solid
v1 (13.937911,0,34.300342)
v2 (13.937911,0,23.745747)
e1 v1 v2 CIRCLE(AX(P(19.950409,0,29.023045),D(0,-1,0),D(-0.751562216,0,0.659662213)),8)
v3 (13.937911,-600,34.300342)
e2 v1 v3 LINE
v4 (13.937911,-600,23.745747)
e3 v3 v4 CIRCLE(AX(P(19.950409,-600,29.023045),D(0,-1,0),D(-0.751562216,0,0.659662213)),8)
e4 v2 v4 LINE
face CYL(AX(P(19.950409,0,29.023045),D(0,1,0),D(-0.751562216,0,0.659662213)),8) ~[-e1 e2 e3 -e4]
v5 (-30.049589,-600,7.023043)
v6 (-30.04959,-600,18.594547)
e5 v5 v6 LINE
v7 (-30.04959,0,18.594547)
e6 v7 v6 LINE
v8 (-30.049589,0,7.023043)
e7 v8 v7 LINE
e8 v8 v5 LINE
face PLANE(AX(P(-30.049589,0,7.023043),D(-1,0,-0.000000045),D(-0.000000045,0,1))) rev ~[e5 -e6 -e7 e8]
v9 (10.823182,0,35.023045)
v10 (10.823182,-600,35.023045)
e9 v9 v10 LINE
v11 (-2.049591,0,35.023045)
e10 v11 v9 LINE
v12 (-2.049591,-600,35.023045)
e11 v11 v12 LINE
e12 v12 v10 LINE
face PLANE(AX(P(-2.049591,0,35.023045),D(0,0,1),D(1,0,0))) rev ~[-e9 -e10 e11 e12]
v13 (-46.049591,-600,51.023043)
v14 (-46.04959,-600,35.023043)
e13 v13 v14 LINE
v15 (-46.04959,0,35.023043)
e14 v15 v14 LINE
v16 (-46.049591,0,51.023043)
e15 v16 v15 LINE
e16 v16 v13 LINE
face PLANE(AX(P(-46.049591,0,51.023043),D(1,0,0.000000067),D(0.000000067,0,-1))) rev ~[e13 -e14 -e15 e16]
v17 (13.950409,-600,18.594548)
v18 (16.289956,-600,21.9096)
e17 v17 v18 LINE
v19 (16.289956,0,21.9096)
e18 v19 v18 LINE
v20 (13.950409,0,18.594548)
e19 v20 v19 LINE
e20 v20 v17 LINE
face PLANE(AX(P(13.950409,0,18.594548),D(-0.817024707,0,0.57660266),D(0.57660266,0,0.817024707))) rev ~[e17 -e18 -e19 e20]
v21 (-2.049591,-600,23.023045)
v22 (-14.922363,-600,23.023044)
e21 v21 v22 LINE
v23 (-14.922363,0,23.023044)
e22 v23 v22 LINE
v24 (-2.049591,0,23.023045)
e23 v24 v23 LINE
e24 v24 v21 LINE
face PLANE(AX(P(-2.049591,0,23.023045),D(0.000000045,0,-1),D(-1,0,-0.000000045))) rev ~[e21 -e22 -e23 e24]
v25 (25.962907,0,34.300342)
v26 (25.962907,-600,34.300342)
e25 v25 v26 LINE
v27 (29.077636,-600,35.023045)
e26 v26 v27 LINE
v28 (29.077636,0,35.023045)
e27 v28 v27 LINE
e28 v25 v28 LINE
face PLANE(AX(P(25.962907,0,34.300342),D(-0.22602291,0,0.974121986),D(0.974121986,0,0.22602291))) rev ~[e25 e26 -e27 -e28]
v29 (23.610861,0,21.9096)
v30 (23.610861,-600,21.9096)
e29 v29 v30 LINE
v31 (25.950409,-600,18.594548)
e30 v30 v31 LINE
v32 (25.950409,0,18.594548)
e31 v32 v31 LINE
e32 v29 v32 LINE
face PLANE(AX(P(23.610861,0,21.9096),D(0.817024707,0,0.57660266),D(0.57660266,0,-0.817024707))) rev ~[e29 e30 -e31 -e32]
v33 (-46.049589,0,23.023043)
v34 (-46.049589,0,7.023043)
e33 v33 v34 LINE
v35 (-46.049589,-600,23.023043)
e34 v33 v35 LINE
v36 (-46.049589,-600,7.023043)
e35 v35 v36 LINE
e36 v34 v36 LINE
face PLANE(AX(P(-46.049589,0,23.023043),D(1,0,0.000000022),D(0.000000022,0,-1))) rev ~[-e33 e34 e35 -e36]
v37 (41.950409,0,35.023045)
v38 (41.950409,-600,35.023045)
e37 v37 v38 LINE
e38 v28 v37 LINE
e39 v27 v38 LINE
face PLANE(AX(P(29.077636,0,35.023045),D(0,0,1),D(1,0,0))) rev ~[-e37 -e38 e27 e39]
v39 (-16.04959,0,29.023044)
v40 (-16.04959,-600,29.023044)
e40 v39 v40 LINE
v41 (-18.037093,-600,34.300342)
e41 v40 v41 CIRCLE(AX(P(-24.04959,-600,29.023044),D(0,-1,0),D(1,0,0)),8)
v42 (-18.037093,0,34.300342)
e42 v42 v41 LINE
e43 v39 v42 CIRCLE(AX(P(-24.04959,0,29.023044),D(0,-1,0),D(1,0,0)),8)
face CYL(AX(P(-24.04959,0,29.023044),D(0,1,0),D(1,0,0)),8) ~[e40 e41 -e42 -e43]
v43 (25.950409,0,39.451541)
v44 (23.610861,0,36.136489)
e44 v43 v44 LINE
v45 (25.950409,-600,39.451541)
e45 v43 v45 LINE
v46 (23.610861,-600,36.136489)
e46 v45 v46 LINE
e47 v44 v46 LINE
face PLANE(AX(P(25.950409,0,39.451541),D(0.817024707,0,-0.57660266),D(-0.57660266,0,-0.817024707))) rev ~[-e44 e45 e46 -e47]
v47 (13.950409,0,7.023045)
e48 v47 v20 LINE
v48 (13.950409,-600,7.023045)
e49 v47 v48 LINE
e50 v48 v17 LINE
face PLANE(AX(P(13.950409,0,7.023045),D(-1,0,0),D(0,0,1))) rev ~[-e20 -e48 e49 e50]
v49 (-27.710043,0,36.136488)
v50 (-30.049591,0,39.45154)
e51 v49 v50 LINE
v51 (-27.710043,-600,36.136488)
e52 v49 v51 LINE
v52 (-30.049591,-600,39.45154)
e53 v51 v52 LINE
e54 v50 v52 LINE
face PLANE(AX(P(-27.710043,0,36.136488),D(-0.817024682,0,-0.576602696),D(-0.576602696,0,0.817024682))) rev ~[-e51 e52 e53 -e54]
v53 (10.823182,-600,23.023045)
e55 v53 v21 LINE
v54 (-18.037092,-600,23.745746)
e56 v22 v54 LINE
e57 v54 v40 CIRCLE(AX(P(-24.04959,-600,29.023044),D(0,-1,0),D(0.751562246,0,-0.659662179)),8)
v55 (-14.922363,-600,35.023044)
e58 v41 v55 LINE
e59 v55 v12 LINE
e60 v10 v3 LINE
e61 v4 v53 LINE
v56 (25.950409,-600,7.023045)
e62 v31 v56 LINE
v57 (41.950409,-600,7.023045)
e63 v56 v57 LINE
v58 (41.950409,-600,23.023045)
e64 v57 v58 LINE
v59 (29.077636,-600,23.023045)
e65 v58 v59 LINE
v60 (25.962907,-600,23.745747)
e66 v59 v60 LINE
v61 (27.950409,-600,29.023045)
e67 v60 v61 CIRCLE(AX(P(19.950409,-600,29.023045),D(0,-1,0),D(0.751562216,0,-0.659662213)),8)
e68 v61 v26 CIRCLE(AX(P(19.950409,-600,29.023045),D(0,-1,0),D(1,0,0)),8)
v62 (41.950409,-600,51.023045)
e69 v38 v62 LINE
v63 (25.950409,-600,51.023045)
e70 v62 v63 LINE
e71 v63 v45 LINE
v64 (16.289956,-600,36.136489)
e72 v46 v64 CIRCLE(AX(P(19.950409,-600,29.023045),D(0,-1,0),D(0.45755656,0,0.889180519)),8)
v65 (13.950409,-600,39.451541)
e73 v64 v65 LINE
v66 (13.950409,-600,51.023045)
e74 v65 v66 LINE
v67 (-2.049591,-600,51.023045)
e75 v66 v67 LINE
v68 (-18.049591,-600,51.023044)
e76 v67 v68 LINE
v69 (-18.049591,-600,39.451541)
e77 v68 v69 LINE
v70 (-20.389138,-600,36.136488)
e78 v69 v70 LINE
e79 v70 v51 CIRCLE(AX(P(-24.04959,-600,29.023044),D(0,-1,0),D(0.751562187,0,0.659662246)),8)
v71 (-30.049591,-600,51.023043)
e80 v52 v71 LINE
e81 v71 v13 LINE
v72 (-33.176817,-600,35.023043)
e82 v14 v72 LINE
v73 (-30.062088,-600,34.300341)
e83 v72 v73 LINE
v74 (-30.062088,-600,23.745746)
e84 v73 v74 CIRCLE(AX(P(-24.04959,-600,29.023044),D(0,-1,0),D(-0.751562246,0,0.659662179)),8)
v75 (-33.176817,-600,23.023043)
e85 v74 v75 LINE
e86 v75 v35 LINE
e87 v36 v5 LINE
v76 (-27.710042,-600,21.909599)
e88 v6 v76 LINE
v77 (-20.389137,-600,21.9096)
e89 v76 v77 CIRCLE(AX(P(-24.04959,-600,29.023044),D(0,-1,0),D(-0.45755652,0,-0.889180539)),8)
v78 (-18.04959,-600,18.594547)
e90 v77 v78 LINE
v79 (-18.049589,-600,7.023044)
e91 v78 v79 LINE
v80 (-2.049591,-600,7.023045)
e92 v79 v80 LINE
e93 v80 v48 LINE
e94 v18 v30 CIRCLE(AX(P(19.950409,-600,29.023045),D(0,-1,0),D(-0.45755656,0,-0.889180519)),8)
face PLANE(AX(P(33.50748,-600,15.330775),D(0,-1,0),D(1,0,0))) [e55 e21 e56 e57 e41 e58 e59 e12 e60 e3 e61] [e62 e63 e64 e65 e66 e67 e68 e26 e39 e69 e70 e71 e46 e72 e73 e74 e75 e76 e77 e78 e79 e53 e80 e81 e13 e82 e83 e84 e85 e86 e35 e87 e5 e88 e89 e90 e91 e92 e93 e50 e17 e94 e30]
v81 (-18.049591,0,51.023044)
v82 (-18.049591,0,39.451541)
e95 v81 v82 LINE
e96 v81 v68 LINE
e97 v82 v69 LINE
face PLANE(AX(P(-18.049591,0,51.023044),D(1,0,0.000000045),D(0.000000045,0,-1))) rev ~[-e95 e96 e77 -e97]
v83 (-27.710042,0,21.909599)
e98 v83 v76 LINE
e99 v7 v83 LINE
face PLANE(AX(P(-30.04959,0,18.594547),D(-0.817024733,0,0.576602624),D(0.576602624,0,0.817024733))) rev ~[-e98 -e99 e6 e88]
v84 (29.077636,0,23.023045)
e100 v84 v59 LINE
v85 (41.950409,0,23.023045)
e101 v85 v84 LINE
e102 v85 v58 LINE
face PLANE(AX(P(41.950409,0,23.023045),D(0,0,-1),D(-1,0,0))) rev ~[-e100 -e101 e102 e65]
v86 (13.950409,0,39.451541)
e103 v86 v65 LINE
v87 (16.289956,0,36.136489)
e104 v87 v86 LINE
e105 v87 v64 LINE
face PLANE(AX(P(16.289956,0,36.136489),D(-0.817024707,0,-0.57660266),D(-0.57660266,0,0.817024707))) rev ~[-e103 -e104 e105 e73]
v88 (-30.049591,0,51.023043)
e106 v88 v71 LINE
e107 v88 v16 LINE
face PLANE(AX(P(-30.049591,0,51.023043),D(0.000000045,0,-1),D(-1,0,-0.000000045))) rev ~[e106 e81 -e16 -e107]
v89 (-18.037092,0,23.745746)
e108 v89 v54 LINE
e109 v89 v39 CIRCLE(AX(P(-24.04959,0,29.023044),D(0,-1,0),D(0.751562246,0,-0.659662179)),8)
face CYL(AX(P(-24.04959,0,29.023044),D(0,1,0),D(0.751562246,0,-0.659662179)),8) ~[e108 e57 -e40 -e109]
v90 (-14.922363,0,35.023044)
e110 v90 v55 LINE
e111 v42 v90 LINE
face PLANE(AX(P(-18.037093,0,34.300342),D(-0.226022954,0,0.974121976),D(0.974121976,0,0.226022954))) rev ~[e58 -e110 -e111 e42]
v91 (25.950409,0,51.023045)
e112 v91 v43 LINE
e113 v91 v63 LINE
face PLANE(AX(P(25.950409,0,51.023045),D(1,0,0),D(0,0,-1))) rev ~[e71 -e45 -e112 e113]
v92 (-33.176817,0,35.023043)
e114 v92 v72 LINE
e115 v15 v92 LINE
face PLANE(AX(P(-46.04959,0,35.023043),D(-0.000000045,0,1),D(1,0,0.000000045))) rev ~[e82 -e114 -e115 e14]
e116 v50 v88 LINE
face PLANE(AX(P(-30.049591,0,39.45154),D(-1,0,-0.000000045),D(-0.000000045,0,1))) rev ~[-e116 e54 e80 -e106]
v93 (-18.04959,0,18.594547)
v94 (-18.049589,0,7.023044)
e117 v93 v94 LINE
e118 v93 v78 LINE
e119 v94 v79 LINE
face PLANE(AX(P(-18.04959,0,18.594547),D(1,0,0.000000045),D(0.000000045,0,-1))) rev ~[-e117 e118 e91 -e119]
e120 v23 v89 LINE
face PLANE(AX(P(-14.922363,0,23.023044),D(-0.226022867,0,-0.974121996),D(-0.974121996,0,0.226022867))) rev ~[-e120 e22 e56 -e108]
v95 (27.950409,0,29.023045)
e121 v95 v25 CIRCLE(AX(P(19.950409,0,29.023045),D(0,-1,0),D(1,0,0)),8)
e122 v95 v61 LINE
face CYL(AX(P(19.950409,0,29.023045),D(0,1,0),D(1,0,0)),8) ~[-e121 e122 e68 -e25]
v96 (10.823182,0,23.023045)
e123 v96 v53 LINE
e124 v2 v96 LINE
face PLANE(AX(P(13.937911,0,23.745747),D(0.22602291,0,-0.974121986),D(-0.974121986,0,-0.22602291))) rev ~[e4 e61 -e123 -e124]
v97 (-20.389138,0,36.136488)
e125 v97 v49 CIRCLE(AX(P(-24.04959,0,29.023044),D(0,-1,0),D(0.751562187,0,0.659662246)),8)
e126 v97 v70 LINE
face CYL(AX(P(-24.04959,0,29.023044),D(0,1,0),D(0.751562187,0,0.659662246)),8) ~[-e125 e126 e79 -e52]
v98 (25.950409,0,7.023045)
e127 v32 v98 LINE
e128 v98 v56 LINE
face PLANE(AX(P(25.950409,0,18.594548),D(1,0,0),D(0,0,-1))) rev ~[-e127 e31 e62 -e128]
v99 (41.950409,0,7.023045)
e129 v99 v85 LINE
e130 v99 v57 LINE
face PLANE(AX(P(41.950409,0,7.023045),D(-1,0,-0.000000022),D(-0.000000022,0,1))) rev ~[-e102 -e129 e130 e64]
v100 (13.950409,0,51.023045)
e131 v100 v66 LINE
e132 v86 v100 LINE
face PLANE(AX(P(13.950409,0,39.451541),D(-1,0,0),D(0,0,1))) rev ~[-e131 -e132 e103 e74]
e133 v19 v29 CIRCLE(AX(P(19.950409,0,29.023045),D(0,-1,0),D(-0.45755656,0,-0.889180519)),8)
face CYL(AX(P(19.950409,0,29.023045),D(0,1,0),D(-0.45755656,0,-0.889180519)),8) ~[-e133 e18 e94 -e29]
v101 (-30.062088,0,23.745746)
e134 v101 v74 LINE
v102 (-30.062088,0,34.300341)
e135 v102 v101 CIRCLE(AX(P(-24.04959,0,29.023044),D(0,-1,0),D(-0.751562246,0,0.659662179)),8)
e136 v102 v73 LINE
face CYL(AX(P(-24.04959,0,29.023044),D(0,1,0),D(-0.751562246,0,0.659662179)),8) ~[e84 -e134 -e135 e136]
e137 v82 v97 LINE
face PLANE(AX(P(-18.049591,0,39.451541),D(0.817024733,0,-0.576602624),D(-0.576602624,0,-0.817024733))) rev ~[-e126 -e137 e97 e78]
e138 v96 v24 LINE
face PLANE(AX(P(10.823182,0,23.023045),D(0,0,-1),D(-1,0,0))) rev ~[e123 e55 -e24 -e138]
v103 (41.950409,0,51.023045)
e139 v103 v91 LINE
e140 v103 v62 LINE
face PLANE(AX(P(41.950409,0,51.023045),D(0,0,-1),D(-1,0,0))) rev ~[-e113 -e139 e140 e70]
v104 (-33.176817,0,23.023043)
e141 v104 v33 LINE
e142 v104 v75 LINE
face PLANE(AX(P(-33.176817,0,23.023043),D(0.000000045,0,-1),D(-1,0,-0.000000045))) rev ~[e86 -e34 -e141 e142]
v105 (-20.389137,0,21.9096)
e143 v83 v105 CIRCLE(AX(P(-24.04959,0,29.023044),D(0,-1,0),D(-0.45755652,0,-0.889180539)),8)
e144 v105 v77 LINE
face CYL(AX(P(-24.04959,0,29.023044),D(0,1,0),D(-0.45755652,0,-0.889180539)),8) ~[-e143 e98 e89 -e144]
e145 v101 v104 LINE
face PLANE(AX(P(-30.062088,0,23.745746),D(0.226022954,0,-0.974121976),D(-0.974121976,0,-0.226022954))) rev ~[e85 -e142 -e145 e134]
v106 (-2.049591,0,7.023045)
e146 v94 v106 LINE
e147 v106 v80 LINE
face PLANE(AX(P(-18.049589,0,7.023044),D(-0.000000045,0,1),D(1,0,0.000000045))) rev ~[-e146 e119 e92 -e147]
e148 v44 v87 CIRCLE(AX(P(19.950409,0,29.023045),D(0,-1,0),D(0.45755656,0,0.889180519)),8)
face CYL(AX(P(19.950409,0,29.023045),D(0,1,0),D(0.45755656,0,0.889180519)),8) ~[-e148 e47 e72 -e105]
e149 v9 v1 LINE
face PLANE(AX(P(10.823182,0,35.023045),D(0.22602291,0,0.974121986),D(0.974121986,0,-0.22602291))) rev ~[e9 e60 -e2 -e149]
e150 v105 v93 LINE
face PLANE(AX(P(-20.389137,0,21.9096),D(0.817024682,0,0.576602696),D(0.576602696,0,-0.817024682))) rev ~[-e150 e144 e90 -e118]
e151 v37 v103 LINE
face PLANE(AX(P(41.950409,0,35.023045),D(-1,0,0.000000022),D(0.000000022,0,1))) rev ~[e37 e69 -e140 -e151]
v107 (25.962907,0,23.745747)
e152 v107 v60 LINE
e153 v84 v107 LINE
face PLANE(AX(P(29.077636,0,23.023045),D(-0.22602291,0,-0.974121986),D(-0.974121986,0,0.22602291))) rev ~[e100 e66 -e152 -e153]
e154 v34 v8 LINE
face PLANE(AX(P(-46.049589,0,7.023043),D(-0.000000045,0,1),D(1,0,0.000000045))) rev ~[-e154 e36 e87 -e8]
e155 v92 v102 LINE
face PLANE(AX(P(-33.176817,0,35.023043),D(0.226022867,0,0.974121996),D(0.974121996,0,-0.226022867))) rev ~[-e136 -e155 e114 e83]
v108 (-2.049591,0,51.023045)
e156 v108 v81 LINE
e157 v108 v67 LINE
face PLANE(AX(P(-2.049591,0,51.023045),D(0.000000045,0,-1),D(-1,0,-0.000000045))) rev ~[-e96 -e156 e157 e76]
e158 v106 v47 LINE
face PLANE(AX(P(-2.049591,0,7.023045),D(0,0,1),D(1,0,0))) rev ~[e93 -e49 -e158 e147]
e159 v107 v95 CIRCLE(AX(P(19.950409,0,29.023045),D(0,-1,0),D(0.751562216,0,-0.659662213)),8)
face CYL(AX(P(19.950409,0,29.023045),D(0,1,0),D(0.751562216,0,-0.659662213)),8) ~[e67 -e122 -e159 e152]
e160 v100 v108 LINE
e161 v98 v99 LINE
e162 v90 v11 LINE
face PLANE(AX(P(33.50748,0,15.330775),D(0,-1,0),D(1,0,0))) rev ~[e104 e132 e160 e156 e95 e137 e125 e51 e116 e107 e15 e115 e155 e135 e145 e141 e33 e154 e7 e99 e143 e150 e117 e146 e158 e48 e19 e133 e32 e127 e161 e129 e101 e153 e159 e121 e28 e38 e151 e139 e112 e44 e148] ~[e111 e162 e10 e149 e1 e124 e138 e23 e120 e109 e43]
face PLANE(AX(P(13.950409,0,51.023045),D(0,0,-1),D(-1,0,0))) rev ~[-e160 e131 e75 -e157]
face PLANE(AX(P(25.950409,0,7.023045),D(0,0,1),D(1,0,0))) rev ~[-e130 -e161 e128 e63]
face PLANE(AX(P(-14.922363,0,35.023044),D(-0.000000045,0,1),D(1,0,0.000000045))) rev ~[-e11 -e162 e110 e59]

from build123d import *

# Parameters (mm, degrees)
F1_DEPTH = 600


# Not quite as in the source:
# - ends of sketch curves that miss each other by under 0.0002 mm in the source are joined


with BuildPart() as f1:
    # F0 (on Front) → F1 (new body)
    with BuildSketch(Plane.XZ):
        with BuildLine():
            Line((25.9504089346, 7.0230446355), (41.9504089346, 7.0230446355))
            Line((41.9504089346, 7.0230446355), (41.9504085783, 23.0230446355))
            Line((41.9504085783, 23.0230446355), (29.0776360335, 23.0230446355))
            Line((29.0776360335, 23.0230446355), (25.9629066643, 23.7457469321))
            ThreePointArc((25.9629066643, 23.7457469321), (24.8732485493, 22.7170435153), (23.6108614125, 21.9096004868))
            Line((23.6108614125, 21.9096004868), (25.9504089346, 18.5945479171))
            Line((25.9504089346, 18.5945479171), (25.9504089346, 7.0230446355))
        make_face()
        with BuildLine():
            ThreePointArc((16.2899564567, 21.9096004868), (19.9504089346, 21.0230446355), (23.6108614125, 21.9096004868))
            ThreePointArc((23.6108614125, 21.9096004868), (24.8732485493, 22.7170435153), (25.9629066643, 23.7457469321))
            ThreePointArc((25.9629066643, 23.7457469321), (27.4370631218, 26.2034685892), (27.9504089346, 29.0230446355))
            ThreePointArc((27.9504089346, 29.0230446355), (27.4370631218, 31.8426206818), (25.9629066643, 34.3003423389))
            ThreePointArc((25.9629066643, 34.3003423389), (24.8732485493, 35.3290457557), (23.6108614125, 36.1364887842))
            ThreePointArc((23.6108614125, 36.1364887842), (19.9504089346, 37.0230446355), (16.2899564567, 36.1364887842))
            ThreePointArc((16.2899564567, 36.1364887842), (15.0275693199, 35.3290457557), (13.9379112049, 34.3003423389))
            ThreePointArc((13.9379112049, 34.3003423389), (11.9504089346, 29.0230446355), (13.9379112049, 23.7457469321))
            ThreePointArc((13.9379112049, 23.7457469321), (15.0275693199, 22.7170435153), (16.2899564567, 21.9096004868))
        make_face()
        with BuildLine():
            Line((13.9504089346, 18.5945479171), (16.2899564567, 21.9096004868))
            ThreePointArc((16.2899564567, 21.9096004868), (15.0275693199, 22.7170435153), (13.9379112049, 23.7457469321))
            Line((13.9379112049, 23.7457469321), (10.8231818357, 23.0230446355))
            Line((10.8231818357, 23.0230446355), (-2.0495907091, 23.0230446355))
            Line((-2.0495907091, 23.0230446355), (-2.0495910654, 7.0230446355))
            Line((-2.0495910654, 7.0230446355), (13.9504089346, 7.0230446355))
            Line((13.9504089346, 7.0230446355), (13.9504089346, 18.5945479171))
        make_face()
        with BuildLine():
            ThreePointArc((23.6108614125, 36.1364887842), (24.8732485493, 35.3290457557), (25.9629066643, 34.3003423389))
            Line((25.9629066643, 34.3003423389), (29.0776360335, 35.0230446355))
            Line((29.0776360335, 35.0230446355), (41.9504085783, 35.0230446355))
            Line((41.9504085783, 35.0230446355), (41.9504089346, 51.0230446355))
            Line((41.9504089346, 51.0230446355), (25.9504089346, 51.0230446355))
            Line((25.9504089346, 51.0230446355), (25.9504089346, 39.4515413539))
            Line((25.9504089346, 39.4515413539), (23.6108614125, 36.1364887842))
        make_face()
        with BuildLine():
            Line((10.8231818357, 35.0230446355), (13.9379112049, 34.3003423389))
            ThreePointArc((13.9379112049, 34.3003423389), (15.0275693199, 35.3290457557), (16.2899564567, 36.1364887842))
            Line((16.2899564567, 36.1364887842), (13.9504089346, 39.4515413539))
            Line((13.9504089346, 39.4515413539), (13.9504089346, 51.0230446355))
            Line((13.9504089346, 51.0230446355), (-2.0495910654, 51.0230446355))
            Line((-2.0495910654, 51.0230446355), (-2.0495907091, 35.0230446355))
            Line((-2.0495907091, 35.0230446355), (10.8231818357, 35.0230446355))
        make_face()
        with BuildLine():
            Line((-2.0495910654, 7.0230446355), (-2.0495907091, 23.0230446355))
            Line((-2.0495907091, 23.0230446355), (-14.9223627195, 23.0230440622))
            Line((-14.9223627195, 23.0230440622), (-18.0370921209, 23.7457462201))
            ThreePointArc((-18.0370921209, 23.7457462201), (-19.1267501901, 22.7170427548), (-20.389137291, 21.90959967))
            Line((-20.389137291, 21.90959967), (-18.0495896212, 18.5945472045))
            Line((-18.0495896212, 18.5945472045), (-18.0495891058, 7.0230439229))
            Line((-18.0495891058, 7.0230439229), (-2.0495910654, 7.0230446355))
        make_face()
        with BuildLine():
            Line((-14.9223632539, 35.0230440622), (-2.0495907091, 35.0230446355))
            Line((-2.0495907091, 35.0230446355), (-2.0495910654, 51.0230446355))
            Line((-2.0495910654, 51.0230446355), (-18.0495910654, 51.0230439229))
            Line((-18.0495910654, 51.0230439229), (-18.0495905501, 39.4515406413))
            Line((-18.0495905501, 39.4515406413), (-20.3891379246, 36.1364879675))
            ThreePointArc((-20.3891379246, 36.1364879675), (-19.1267507518, 35.3290449952), (-18.0370925909, 34.3003416269))
            Line((-18.0370925909, 34.3003416269), (-14.9223632539, 35.0230440622))
        make_face()
        with BuildLine():
            ThreePointArc((-20.389137291, 21.90959967), (-19.1267501901, 22.7170427548), (-18.0370921209, 23.7457462201))
            ThreePointArc((-18.0370921209, 23.7457462201), (-16.5629358356, 26.2034677761), (-16.0495900856, 29.0230436557))
            ThreePointArc((-16.0495900856, 29.0230436557), (-16.5629359612, 31.8426198688), (-18.0370925909, 34.3003416269))
            ThreePointArc((-18.0370925909, 34.3003416269), (-19.1267507518, 35.3290449952), (-20.3891379246, 36.1364879675))
            ThreePointArc((-20.3891379246, 36.1364879675), (-24.0495904419, 37.0230436557), (-27.7100428803, 36.1364876414))
            ThreePointArc((-27.7100428803, 36.1364876414), (-28.9724299811, 35.3290445567), (-30.0620880504, 34.3003410913))
            ThreePointArc((-30.0620880504, 34.3003410913), (-32.0495900856, 29.0230432994), (-30.0620875803, 23.7457456846))
            ThreePointArc((-30.0620875803, 23.7457456846), (-28.9724294195, 22.7170423163), (-27.7100422467, 21.909599344))
            ThreePointArc((-27.7100422467, 21.909599344), (-24.0495897293, 21.0230436557), (-20.389137291, 21.90959967))
        make_face()
        with BuildLine():
            Line((-30.0495896212, 18.5945466701), (-27.7100422467, 21.909599344))
            ThreePointArc((-27.7100422467, 21.909599344), (-28.9724294195, 22.7170423163), (-30.0620875803, 23.7457456846))
            Line((-30.0620875803, 23.7457456846), (-33.1768169173, 23.0230432492))
            Line((-33.1768169173, 23.0230432492), (-46.0495894621, 23.0230426759))
            Line((-46.0495894621, 23.0230426759), (-46.0495891058, 7.0230426759))
            Line((-46.0495891058, 7.0230426759), (-30.0495891058, 7.0230433885))
            Line((-30.0495891058, 7.0230433885), (-30.0495896212, 18.5945466701))
        make_face()
        with BuildLine():
            ThreePointArc((-30.0620880504, 34.3003410913), (-28.9724299811, 35.3290445567), (-27.7100428803, 36.1364876414))
            Line((-27.7100428803, 36.1364876414), (-30.0495905501, 39.4515401069))
            Line((-30.0495905501, 39.4515401069), (-30.0495910654, 51.0230433885))
            Line((-30.0495910654, 51.0230433885), (-46.0495910654, 51.0230426759))
            Line((-46.0495910654, 51.0230426759), (-46.0495899966, 35.0230426759))
            Line((-46.0495899966, 35.0230426759), (-33.1768174518, 35.0230432492))
            Line((-33.1768174518, 35.0230432492), (-30.0620880504, 34.3003410913))
        make_face()
    extrude(amount=F1_DEPTH)


solid = f1.part
